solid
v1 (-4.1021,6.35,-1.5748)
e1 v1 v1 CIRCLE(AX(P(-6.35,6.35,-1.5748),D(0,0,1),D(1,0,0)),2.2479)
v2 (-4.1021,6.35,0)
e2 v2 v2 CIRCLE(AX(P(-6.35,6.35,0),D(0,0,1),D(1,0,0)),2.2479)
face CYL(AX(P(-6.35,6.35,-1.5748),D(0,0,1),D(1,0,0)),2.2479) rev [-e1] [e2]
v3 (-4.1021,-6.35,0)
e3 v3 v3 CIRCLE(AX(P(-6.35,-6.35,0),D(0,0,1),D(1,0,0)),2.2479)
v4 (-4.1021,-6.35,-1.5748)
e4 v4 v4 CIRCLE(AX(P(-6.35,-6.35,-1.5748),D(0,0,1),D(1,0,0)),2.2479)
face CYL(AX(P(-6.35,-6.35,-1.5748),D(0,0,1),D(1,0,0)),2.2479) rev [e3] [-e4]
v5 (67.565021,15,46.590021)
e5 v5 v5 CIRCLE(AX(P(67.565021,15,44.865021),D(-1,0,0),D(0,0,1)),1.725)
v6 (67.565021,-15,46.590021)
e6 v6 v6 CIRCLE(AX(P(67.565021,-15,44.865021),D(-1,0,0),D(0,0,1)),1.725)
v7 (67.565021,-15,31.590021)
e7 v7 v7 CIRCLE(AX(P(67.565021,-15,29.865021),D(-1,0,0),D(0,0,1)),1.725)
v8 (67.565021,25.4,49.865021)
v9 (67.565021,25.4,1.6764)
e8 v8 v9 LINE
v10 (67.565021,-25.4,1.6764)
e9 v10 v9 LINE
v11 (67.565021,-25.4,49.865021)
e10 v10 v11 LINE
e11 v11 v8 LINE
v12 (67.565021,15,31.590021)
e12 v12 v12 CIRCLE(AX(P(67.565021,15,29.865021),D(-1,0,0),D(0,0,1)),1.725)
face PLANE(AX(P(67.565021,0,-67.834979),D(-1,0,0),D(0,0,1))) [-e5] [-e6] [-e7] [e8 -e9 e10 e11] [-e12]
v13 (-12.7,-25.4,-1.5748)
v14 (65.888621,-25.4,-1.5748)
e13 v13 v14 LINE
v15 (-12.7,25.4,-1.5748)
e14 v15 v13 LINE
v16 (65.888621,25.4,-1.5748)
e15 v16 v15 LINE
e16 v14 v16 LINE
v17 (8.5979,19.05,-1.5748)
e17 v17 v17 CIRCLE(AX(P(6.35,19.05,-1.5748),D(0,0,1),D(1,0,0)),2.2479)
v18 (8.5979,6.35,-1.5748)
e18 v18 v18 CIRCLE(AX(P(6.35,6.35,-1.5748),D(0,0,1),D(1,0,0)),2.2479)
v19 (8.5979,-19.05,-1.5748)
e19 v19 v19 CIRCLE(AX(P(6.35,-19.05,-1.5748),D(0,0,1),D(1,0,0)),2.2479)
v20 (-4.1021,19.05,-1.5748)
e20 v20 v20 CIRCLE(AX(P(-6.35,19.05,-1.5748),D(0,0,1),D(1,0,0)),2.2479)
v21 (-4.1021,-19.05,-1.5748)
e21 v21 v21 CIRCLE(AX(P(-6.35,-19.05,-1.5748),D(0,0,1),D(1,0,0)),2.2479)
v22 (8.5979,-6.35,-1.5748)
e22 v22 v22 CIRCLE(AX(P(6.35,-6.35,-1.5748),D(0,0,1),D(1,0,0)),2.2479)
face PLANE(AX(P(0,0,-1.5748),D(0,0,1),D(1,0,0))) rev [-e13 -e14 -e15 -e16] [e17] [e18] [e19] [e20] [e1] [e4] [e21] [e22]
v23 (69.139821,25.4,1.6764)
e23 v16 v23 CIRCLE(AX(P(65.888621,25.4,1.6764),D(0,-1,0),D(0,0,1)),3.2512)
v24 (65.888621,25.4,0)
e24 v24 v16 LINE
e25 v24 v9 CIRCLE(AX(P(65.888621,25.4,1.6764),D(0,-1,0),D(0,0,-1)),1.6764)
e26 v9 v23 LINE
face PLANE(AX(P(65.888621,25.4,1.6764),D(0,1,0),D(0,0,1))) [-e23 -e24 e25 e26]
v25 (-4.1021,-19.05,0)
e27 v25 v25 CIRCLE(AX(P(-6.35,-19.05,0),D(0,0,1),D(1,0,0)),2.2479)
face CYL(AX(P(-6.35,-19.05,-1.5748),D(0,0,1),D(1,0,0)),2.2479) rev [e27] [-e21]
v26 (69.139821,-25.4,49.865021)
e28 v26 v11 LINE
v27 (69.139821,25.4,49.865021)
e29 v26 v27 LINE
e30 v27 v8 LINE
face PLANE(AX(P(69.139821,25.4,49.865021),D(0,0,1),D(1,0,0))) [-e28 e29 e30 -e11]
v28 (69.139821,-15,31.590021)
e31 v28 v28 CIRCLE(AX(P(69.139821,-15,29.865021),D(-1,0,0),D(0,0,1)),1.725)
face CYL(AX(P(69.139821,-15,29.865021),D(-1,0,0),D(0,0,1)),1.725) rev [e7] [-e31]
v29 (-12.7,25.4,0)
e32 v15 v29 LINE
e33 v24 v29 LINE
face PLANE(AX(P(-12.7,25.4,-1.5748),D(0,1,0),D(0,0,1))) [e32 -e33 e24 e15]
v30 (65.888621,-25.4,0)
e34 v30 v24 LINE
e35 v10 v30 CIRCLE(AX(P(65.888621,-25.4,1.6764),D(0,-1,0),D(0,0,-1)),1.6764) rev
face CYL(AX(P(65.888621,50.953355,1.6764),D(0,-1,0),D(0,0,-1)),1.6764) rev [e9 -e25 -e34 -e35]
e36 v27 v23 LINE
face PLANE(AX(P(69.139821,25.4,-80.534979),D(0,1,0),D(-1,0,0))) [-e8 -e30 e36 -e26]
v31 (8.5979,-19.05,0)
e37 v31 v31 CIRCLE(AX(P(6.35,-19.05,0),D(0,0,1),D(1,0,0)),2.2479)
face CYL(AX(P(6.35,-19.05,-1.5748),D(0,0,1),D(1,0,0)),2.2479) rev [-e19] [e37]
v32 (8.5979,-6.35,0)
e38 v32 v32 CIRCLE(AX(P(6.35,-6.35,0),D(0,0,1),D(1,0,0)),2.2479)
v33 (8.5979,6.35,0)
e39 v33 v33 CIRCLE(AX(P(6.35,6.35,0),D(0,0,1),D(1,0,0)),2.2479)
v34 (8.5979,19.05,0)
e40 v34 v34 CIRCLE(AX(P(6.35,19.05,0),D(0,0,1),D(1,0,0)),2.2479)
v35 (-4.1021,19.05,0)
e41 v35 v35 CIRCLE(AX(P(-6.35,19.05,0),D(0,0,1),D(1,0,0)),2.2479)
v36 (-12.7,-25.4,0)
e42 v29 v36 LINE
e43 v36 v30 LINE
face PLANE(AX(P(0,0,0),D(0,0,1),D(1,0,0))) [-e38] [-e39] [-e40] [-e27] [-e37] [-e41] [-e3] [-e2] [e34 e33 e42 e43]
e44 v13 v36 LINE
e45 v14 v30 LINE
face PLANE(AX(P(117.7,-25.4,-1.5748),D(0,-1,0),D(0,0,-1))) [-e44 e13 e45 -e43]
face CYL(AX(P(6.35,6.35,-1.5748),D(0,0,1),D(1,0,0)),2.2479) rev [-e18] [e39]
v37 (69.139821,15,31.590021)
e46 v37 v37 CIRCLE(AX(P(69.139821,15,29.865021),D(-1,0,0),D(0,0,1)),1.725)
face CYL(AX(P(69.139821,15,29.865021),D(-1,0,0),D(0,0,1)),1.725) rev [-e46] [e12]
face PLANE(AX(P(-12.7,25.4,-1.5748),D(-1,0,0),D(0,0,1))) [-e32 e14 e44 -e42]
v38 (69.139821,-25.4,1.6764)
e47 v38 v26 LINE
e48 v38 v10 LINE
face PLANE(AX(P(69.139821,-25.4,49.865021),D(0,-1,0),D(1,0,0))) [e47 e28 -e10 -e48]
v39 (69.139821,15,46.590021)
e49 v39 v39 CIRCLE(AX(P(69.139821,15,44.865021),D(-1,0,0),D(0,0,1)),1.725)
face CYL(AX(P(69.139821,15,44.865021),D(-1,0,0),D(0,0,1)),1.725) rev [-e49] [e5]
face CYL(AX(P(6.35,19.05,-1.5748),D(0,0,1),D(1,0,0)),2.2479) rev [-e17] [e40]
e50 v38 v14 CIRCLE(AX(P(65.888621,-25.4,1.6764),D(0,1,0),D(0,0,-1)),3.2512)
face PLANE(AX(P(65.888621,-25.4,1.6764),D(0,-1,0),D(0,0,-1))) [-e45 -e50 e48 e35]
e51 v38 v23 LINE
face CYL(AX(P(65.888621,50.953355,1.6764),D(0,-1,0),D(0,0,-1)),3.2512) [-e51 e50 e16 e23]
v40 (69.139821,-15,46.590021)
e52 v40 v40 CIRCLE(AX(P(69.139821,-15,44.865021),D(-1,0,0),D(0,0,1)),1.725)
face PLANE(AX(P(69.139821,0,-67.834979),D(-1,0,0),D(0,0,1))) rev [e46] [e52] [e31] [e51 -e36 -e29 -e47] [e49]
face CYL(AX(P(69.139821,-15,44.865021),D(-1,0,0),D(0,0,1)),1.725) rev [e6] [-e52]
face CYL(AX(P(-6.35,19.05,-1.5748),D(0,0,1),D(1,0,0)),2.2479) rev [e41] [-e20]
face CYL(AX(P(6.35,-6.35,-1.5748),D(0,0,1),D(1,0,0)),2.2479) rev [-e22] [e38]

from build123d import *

# Parameters (mm, degrees)
SKETCH1_R                  = 2.2479
SKETCH1_R_2                = 1.725
BASE_FLANGE1_DEPTH         = 1.5748
SKETCHED_START             = 68.796428764
SKETCHED_BEND1_OUTLINE_W   = 50.8
SKETCHED_BEND1_OUTLINE_H   = 1.5748
SKETCHED_BEND1_DEPTH       = 48.903571236
SKETCHED_START_2           = 65.888620508
SKETCHED_BEND1_2_OUTLINE_W = 50.8
SKETCHED_BEND1_2_OUTLINE_H = 49.865020508
SKETCHED_BEND1_2_OUTLINE_R = 1.725
SKETCHED_BEND1_2_DEPTH     = 3.2512
SKETCHED_START_3           = -26
SKETCHED_BEND1_3_DEPTH     = 52


with BuildPart() as part:
    # Base-Flange1: sheet metal written as solids
    # Sketch1 → Base-Flange1 (new body)
    with BuildSketch(Plane.XY):
        Polygon((12.7, 25.4), (117.7, 25.4), (117.7, -25.4), (12.7, -25.4), (-12.7, -25.4), (-12.7, 25.4), align=None)
        with Locations((-6.35, 19.05)):
            Circle(SKETCH1_R, mode=Mode.SUBTRACT)
        with Locations((6.35, 19.05)):
            Circle(SKETCH1_R, mode=Mode.SUBTRACT)
        with Locations((6.35, 6.35)):
            Circle(SKETCH1_R, mode=Mode.SUBTRACT)
        with Locations((6.35, -6.35)):
            Circle(SKETCH1_R, mode=Mode.SUBTRACT)
        with Locations((6.35, -19.05)):
            Circle(SKETCH1_R, mode=Mode.SUBTRACT)
        with Locations((-6.35, 6.35)):
            Circle(SKETCH1_R, mode=Mode.SUBTRACT)
        with Locations((-6.35, -6.35)):
            Circle(SKETCH1_R, mode=Mode.SUBTRACT)
        with Locations((-6.35, -19.05)):
            Circle(SKETCH1_R, mode=Mode.SUBTRACT)
        with Locations((97.7, 15)):
            Circle(SKETCH1_R_2, mode=Mode.SUBTRACT)
        with Locations((112.7, 15)):
            Circle(SKETCH1_R_2, mode=Mode.SUBTRACT)
        with Locations((112.7, -15)):
            Circle(SKETCH1_R_2, mode=Mode.SUBTRACT)
        with Locations((97.7, -15)):
            Circle(SKETCH1_R_2, mode=Mode.SUBTRACT)
    extrude(amount=-BASE_FLANGE1_DEPTH)

    # Sketched Bend1: read off the stored shape, not the designer's step
    # Sketched Bend1 outline → Sketched Bend1 (cut)
    with BuildSketch(Plane.YZ.offset(SKETCHED_START)):
        with Locations((0, -0.7874)):
            Rectangle(SKETCHED_BEND1_OUTLINE_W, SKETCHED_BEND1_OUTLINE_H)
    extrude(amount=SKETCHED_BEND1_DEPTH, mode=Mode.SUBTRACT)

    # Sketched Bend1 2 outline → Sketched Bend1 2 (add)
    with BuildSketch(Plane.YZ.offset(SKETCHED_START_2)):
        with Locations((0, 24.932510254)):
            Rectangle(SKETCHED_BEND1_2_OUTLINE_W, SKETCHED_BEND1_2_OUTLINE_H)
        with Locations((-15, 29.865020508)):
            Circle(SKETCHED_BEND1_2_OUTLINE_R, mode=Mode.SUBTRACT)
        with Locations((-15, 44.865020508)):
            Circle(SKETCHED_BEND1_2_OUTLINE_R, mode=Mode.SUBTRACT)
        with Locations((15, 29.865020508)):
            Circle(SKETCHED_BEND1_2_OUTLINE_R, mode=Mode.SUBTRACT)
        with Locations((15, 44.865020508)):
            Circle(SKETCHED_BEND1_2_OUTLINE_R, mode=Mode.SUBTRACT)
    extrude(amount=SKETCHED_BEND1_2_DEPTH)

    # Sketched Bend1 3 outline → Sketched Bend1 3 (cut)
    with BuildSketch(Plane(origin=(0, 0, 0), x_dir=(1, 0, 0), z_dir=(0, 1, 0)).offset(SKETCHED_START_3)):
        with BuildLine():
            ThreePointArc((65.888620508, 1.5748), (68.187566075, 0.622545567), (69.139820508, -1.6764))
            Line((69.139820508, -1.6764), (69.139820508, 0))
            Line((69.139820508, 0), (68.796428764, 0))
            Line((68.796428764, 0), (68.796428764, 1.5748))
            Line((68.796428764, 1.5748), (65.888620508, 1.5748))
        make_face()
        with BuildLine():
            Line((67.565020508, -49.865020508), (67.565020508, -1.6764))
            ThreePointArc((67.565020508, -1.6764), (67.074014316, -0.491006192), (65.888620508, 0))
            Line((65.888620508, 0), (65.888620508, -49.865020508))
            Line((65.888620508, -49.865020508), (67.565020508, -49.865020508))
        make_face()
    extrude(amount=SKETCHED_BEND1_3_DEPTH, mode=Mode.SUBTRACT)


solid = part.part
